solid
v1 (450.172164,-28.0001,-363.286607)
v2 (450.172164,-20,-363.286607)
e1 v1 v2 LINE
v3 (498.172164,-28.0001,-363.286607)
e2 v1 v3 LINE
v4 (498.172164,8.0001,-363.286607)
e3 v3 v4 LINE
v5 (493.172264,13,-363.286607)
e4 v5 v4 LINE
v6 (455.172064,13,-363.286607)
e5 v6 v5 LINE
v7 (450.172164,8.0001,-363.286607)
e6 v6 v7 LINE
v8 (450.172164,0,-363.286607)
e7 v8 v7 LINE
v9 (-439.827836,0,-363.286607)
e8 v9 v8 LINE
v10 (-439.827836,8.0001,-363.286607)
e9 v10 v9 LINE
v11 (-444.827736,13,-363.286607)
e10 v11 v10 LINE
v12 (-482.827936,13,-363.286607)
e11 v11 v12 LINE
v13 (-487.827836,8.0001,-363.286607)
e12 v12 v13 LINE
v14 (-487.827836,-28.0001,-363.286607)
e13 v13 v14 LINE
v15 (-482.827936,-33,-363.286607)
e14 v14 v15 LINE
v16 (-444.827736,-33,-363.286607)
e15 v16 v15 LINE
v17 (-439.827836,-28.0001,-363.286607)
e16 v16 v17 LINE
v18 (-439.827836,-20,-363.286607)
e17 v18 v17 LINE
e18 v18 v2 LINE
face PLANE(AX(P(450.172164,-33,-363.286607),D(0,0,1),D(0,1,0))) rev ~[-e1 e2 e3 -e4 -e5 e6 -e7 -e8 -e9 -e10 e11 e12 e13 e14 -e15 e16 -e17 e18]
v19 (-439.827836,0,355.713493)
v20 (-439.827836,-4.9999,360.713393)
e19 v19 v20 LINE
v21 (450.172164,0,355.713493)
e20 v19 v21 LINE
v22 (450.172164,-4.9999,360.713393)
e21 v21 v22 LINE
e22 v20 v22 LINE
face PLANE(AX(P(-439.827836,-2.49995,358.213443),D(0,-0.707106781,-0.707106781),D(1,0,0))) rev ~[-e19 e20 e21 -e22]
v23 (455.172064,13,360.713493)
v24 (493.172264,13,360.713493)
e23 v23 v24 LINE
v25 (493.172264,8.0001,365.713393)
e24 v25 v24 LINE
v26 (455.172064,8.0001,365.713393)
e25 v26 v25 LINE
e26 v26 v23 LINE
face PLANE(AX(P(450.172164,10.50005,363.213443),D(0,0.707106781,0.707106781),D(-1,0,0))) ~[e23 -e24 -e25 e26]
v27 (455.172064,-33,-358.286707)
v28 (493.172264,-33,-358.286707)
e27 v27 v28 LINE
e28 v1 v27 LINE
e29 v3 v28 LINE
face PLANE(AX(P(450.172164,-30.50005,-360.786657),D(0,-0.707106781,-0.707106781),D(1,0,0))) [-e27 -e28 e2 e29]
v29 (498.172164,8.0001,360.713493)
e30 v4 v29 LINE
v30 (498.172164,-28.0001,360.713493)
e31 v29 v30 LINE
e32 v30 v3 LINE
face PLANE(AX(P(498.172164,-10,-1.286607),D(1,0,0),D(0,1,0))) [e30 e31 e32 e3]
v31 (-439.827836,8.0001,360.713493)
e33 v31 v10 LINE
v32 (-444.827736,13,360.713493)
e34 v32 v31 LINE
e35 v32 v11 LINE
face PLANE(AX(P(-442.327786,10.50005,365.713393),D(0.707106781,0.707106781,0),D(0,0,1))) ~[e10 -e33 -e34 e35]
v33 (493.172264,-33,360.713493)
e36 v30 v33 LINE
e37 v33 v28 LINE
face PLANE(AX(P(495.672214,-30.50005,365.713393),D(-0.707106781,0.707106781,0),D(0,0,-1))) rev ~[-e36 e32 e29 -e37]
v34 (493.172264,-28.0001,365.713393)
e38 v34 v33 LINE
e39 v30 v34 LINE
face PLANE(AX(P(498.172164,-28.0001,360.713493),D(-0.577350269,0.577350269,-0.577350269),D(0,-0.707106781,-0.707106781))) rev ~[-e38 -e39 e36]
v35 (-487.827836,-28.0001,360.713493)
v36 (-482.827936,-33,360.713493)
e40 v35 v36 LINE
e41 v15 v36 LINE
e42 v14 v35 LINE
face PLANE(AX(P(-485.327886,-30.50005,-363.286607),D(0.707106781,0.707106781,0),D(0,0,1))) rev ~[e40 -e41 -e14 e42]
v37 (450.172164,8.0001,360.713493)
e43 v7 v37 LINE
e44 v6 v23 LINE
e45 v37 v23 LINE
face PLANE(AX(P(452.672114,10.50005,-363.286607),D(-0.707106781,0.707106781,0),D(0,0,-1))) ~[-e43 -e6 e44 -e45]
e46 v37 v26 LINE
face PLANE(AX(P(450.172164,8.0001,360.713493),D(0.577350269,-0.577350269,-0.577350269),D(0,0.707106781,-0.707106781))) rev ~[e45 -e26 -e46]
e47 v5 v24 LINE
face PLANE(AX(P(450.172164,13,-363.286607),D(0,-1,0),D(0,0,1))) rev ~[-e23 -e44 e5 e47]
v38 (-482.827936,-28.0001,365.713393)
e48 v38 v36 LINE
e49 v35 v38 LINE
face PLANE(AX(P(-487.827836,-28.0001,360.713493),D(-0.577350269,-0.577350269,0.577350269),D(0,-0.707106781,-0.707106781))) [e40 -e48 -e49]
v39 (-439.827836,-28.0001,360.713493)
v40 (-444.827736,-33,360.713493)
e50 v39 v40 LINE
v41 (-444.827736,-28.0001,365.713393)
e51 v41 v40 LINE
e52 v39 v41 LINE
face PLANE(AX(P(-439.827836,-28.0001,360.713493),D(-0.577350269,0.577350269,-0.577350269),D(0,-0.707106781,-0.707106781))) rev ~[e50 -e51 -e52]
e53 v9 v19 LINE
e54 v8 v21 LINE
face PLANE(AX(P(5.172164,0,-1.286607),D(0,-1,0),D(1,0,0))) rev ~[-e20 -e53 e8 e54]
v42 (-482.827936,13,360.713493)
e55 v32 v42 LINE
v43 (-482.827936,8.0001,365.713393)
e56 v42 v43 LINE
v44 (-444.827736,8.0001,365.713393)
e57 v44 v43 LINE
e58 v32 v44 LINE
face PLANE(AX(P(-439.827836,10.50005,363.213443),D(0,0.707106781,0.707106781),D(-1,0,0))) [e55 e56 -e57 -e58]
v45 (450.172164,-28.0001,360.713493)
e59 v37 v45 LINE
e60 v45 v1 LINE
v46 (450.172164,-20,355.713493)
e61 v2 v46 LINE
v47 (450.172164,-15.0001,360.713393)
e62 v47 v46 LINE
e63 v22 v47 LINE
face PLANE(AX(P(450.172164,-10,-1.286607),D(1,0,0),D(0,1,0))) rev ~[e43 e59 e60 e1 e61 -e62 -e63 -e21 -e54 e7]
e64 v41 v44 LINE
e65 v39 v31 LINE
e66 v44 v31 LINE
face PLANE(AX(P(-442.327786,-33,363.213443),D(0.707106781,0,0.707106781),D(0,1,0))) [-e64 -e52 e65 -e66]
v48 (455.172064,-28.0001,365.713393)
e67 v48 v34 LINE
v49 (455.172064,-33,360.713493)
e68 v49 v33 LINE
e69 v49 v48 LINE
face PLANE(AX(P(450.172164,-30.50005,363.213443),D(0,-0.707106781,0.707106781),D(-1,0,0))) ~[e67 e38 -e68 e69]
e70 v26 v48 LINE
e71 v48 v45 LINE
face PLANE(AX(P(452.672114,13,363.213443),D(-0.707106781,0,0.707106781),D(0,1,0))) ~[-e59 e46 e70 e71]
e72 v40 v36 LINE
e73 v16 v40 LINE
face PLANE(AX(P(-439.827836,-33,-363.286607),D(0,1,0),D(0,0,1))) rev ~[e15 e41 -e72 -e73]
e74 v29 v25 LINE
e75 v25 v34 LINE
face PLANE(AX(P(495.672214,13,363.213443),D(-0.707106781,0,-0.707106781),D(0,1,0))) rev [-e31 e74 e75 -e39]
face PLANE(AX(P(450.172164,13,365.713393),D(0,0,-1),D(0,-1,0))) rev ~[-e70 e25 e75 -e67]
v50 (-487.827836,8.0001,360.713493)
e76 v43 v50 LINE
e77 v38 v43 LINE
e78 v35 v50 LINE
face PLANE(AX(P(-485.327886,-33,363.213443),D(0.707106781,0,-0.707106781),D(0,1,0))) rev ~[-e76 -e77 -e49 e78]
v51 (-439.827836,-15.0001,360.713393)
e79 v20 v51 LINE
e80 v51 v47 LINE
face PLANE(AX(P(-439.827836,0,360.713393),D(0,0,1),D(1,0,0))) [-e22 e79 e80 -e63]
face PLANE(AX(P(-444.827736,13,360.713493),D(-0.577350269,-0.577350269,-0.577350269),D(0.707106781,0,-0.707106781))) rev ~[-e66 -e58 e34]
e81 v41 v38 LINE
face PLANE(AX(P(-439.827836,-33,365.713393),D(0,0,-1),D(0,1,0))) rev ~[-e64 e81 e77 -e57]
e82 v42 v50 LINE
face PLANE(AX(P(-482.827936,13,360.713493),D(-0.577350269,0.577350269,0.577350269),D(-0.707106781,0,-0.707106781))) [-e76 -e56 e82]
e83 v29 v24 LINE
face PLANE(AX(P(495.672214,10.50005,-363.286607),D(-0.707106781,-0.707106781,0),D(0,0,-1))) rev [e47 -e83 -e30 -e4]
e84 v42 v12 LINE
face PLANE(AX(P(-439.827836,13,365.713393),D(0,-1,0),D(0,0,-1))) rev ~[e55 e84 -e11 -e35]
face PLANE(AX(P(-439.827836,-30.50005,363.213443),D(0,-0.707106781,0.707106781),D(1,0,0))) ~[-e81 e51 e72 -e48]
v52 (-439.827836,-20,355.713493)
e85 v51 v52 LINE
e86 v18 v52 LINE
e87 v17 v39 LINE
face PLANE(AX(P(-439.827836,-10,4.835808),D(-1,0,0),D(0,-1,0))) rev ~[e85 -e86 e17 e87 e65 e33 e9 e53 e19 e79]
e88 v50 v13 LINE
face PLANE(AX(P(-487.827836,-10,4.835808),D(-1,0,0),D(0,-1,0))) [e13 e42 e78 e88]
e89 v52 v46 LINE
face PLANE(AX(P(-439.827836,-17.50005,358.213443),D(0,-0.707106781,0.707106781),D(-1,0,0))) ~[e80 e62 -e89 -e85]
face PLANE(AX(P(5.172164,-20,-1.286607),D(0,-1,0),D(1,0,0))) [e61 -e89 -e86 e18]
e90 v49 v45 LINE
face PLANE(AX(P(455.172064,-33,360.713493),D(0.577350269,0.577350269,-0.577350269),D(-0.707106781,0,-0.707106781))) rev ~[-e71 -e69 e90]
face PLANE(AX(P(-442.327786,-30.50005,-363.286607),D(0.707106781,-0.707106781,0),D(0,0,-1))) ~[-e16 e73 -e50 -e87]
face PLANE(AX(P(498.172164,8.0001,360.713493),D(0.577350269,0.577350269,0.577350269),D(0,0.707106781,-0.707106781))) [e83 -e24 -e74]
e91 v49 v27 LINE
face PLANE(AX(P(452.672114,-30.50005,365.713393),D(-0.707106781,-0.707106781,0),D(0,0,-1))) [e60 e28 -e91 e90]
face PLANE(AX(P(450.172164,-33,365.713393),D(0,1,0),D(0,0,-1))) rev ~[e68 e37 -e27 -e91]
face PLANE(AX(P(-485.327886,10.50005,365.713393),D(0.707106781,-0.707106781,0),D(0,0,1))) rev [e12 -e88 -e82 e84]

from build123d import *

# Parameters (mm, degrees)
F0_W     = 890
F0_H     = 724
F1_DEPTH = 20
F2_W     = 20
F2_H     = 724
F3_DEPTH = 48
F4_W     = 20
F4_H     = 724
F5_DEPTH = 48
F6_SIZE  = 4.9999


# Not quite as in the source:
# - a fillet or chamfer is up to 0.001 mm smaller than in the source, because OpenCascade refuses the exact size


with BuildPart() as f1:
    # F0 (on Front) → F1 (new body)
    with BuildSketch(Plane.XZ):
        with Locations((5.1721642405, -1.2866072357)):
            Rectangle(F0_W, F0_H)
    extrude(amount=F1_DEPTH)

    # F2 (on face) → F3 (join)
    with BuildSketch(Plane(origin=(-439.8278357595, 0, 0), x_dir=(0, -1, 0), z_dir=(-1, 0, 0))):
        Polygon((33, 365.7133927643), (-13, 365.7133927643), (-13, -363.2866072357), (0, -363.2866072357), (0, 360.7133927643), (20, 360.7133927643), (20, -363.2866072357), (33, -363.2866072357), align=None)
        with Locations((10, -1.2866072357)):
            Rectangle(F2_W, F2_H)
    extrude(amount=F3_DEPTH)

    # F4 (on face) → F5 (join)
    with BuildSketch(Plane.YZ.offset(450.1721642405)):
        with Locations((-10, -1.2866072357)):
            Rectangle(F4_W, F4_H)
        Polygon((13, 365.7133927643), (-33, 365.7133927643), (-33, -363.2866072357), (-20, -363.2866072357), (-20, 360.7133927643), (0, 360.7133927643), (0, -363.2866072357), (13, -363.2866072357), align=None)
    extrude(amount=F5_DEPTH)

    # F6 (size 5 in the source; OpenCascade refuses exactly that, so slightly less here)
    f6_edges = [f1.edges().sort_by_distance(p)[0] for p in [
        (-463.827836, -33, 365.713393),
        (-487.827836, -10, 365.713393),
        (-439.827836, -10, 365.713393),
        (-463.827836, 13, 365.713393),
        (5.172164, -20, 360.713393),
        (5.172164, 0, 360.713393),
        (474.172164, 13, 365.713393),
        (450.172164, -10, 365.713393),
        (474.172164, -33, 365.713393),
        (498.172164, -10, 365.713393),
        (-487.827836, 13, 1.213393),
        (-439.827836, 13, 1.213393),
        (-487.827836, -33, 1.213393),
        (-439.827836, -33, 1.213393),
        (450.172164, -33, 1.213393),
        (474.172164, -33, -363.286607),
        (498.172164, -33, 1.213393),
        (450.172164, 13, 1.213393),
        (498.172164, 13, 1.213393),
    ]]
    chamfer(f6_edges, length=F6_SIZE)


solid = f1.part
